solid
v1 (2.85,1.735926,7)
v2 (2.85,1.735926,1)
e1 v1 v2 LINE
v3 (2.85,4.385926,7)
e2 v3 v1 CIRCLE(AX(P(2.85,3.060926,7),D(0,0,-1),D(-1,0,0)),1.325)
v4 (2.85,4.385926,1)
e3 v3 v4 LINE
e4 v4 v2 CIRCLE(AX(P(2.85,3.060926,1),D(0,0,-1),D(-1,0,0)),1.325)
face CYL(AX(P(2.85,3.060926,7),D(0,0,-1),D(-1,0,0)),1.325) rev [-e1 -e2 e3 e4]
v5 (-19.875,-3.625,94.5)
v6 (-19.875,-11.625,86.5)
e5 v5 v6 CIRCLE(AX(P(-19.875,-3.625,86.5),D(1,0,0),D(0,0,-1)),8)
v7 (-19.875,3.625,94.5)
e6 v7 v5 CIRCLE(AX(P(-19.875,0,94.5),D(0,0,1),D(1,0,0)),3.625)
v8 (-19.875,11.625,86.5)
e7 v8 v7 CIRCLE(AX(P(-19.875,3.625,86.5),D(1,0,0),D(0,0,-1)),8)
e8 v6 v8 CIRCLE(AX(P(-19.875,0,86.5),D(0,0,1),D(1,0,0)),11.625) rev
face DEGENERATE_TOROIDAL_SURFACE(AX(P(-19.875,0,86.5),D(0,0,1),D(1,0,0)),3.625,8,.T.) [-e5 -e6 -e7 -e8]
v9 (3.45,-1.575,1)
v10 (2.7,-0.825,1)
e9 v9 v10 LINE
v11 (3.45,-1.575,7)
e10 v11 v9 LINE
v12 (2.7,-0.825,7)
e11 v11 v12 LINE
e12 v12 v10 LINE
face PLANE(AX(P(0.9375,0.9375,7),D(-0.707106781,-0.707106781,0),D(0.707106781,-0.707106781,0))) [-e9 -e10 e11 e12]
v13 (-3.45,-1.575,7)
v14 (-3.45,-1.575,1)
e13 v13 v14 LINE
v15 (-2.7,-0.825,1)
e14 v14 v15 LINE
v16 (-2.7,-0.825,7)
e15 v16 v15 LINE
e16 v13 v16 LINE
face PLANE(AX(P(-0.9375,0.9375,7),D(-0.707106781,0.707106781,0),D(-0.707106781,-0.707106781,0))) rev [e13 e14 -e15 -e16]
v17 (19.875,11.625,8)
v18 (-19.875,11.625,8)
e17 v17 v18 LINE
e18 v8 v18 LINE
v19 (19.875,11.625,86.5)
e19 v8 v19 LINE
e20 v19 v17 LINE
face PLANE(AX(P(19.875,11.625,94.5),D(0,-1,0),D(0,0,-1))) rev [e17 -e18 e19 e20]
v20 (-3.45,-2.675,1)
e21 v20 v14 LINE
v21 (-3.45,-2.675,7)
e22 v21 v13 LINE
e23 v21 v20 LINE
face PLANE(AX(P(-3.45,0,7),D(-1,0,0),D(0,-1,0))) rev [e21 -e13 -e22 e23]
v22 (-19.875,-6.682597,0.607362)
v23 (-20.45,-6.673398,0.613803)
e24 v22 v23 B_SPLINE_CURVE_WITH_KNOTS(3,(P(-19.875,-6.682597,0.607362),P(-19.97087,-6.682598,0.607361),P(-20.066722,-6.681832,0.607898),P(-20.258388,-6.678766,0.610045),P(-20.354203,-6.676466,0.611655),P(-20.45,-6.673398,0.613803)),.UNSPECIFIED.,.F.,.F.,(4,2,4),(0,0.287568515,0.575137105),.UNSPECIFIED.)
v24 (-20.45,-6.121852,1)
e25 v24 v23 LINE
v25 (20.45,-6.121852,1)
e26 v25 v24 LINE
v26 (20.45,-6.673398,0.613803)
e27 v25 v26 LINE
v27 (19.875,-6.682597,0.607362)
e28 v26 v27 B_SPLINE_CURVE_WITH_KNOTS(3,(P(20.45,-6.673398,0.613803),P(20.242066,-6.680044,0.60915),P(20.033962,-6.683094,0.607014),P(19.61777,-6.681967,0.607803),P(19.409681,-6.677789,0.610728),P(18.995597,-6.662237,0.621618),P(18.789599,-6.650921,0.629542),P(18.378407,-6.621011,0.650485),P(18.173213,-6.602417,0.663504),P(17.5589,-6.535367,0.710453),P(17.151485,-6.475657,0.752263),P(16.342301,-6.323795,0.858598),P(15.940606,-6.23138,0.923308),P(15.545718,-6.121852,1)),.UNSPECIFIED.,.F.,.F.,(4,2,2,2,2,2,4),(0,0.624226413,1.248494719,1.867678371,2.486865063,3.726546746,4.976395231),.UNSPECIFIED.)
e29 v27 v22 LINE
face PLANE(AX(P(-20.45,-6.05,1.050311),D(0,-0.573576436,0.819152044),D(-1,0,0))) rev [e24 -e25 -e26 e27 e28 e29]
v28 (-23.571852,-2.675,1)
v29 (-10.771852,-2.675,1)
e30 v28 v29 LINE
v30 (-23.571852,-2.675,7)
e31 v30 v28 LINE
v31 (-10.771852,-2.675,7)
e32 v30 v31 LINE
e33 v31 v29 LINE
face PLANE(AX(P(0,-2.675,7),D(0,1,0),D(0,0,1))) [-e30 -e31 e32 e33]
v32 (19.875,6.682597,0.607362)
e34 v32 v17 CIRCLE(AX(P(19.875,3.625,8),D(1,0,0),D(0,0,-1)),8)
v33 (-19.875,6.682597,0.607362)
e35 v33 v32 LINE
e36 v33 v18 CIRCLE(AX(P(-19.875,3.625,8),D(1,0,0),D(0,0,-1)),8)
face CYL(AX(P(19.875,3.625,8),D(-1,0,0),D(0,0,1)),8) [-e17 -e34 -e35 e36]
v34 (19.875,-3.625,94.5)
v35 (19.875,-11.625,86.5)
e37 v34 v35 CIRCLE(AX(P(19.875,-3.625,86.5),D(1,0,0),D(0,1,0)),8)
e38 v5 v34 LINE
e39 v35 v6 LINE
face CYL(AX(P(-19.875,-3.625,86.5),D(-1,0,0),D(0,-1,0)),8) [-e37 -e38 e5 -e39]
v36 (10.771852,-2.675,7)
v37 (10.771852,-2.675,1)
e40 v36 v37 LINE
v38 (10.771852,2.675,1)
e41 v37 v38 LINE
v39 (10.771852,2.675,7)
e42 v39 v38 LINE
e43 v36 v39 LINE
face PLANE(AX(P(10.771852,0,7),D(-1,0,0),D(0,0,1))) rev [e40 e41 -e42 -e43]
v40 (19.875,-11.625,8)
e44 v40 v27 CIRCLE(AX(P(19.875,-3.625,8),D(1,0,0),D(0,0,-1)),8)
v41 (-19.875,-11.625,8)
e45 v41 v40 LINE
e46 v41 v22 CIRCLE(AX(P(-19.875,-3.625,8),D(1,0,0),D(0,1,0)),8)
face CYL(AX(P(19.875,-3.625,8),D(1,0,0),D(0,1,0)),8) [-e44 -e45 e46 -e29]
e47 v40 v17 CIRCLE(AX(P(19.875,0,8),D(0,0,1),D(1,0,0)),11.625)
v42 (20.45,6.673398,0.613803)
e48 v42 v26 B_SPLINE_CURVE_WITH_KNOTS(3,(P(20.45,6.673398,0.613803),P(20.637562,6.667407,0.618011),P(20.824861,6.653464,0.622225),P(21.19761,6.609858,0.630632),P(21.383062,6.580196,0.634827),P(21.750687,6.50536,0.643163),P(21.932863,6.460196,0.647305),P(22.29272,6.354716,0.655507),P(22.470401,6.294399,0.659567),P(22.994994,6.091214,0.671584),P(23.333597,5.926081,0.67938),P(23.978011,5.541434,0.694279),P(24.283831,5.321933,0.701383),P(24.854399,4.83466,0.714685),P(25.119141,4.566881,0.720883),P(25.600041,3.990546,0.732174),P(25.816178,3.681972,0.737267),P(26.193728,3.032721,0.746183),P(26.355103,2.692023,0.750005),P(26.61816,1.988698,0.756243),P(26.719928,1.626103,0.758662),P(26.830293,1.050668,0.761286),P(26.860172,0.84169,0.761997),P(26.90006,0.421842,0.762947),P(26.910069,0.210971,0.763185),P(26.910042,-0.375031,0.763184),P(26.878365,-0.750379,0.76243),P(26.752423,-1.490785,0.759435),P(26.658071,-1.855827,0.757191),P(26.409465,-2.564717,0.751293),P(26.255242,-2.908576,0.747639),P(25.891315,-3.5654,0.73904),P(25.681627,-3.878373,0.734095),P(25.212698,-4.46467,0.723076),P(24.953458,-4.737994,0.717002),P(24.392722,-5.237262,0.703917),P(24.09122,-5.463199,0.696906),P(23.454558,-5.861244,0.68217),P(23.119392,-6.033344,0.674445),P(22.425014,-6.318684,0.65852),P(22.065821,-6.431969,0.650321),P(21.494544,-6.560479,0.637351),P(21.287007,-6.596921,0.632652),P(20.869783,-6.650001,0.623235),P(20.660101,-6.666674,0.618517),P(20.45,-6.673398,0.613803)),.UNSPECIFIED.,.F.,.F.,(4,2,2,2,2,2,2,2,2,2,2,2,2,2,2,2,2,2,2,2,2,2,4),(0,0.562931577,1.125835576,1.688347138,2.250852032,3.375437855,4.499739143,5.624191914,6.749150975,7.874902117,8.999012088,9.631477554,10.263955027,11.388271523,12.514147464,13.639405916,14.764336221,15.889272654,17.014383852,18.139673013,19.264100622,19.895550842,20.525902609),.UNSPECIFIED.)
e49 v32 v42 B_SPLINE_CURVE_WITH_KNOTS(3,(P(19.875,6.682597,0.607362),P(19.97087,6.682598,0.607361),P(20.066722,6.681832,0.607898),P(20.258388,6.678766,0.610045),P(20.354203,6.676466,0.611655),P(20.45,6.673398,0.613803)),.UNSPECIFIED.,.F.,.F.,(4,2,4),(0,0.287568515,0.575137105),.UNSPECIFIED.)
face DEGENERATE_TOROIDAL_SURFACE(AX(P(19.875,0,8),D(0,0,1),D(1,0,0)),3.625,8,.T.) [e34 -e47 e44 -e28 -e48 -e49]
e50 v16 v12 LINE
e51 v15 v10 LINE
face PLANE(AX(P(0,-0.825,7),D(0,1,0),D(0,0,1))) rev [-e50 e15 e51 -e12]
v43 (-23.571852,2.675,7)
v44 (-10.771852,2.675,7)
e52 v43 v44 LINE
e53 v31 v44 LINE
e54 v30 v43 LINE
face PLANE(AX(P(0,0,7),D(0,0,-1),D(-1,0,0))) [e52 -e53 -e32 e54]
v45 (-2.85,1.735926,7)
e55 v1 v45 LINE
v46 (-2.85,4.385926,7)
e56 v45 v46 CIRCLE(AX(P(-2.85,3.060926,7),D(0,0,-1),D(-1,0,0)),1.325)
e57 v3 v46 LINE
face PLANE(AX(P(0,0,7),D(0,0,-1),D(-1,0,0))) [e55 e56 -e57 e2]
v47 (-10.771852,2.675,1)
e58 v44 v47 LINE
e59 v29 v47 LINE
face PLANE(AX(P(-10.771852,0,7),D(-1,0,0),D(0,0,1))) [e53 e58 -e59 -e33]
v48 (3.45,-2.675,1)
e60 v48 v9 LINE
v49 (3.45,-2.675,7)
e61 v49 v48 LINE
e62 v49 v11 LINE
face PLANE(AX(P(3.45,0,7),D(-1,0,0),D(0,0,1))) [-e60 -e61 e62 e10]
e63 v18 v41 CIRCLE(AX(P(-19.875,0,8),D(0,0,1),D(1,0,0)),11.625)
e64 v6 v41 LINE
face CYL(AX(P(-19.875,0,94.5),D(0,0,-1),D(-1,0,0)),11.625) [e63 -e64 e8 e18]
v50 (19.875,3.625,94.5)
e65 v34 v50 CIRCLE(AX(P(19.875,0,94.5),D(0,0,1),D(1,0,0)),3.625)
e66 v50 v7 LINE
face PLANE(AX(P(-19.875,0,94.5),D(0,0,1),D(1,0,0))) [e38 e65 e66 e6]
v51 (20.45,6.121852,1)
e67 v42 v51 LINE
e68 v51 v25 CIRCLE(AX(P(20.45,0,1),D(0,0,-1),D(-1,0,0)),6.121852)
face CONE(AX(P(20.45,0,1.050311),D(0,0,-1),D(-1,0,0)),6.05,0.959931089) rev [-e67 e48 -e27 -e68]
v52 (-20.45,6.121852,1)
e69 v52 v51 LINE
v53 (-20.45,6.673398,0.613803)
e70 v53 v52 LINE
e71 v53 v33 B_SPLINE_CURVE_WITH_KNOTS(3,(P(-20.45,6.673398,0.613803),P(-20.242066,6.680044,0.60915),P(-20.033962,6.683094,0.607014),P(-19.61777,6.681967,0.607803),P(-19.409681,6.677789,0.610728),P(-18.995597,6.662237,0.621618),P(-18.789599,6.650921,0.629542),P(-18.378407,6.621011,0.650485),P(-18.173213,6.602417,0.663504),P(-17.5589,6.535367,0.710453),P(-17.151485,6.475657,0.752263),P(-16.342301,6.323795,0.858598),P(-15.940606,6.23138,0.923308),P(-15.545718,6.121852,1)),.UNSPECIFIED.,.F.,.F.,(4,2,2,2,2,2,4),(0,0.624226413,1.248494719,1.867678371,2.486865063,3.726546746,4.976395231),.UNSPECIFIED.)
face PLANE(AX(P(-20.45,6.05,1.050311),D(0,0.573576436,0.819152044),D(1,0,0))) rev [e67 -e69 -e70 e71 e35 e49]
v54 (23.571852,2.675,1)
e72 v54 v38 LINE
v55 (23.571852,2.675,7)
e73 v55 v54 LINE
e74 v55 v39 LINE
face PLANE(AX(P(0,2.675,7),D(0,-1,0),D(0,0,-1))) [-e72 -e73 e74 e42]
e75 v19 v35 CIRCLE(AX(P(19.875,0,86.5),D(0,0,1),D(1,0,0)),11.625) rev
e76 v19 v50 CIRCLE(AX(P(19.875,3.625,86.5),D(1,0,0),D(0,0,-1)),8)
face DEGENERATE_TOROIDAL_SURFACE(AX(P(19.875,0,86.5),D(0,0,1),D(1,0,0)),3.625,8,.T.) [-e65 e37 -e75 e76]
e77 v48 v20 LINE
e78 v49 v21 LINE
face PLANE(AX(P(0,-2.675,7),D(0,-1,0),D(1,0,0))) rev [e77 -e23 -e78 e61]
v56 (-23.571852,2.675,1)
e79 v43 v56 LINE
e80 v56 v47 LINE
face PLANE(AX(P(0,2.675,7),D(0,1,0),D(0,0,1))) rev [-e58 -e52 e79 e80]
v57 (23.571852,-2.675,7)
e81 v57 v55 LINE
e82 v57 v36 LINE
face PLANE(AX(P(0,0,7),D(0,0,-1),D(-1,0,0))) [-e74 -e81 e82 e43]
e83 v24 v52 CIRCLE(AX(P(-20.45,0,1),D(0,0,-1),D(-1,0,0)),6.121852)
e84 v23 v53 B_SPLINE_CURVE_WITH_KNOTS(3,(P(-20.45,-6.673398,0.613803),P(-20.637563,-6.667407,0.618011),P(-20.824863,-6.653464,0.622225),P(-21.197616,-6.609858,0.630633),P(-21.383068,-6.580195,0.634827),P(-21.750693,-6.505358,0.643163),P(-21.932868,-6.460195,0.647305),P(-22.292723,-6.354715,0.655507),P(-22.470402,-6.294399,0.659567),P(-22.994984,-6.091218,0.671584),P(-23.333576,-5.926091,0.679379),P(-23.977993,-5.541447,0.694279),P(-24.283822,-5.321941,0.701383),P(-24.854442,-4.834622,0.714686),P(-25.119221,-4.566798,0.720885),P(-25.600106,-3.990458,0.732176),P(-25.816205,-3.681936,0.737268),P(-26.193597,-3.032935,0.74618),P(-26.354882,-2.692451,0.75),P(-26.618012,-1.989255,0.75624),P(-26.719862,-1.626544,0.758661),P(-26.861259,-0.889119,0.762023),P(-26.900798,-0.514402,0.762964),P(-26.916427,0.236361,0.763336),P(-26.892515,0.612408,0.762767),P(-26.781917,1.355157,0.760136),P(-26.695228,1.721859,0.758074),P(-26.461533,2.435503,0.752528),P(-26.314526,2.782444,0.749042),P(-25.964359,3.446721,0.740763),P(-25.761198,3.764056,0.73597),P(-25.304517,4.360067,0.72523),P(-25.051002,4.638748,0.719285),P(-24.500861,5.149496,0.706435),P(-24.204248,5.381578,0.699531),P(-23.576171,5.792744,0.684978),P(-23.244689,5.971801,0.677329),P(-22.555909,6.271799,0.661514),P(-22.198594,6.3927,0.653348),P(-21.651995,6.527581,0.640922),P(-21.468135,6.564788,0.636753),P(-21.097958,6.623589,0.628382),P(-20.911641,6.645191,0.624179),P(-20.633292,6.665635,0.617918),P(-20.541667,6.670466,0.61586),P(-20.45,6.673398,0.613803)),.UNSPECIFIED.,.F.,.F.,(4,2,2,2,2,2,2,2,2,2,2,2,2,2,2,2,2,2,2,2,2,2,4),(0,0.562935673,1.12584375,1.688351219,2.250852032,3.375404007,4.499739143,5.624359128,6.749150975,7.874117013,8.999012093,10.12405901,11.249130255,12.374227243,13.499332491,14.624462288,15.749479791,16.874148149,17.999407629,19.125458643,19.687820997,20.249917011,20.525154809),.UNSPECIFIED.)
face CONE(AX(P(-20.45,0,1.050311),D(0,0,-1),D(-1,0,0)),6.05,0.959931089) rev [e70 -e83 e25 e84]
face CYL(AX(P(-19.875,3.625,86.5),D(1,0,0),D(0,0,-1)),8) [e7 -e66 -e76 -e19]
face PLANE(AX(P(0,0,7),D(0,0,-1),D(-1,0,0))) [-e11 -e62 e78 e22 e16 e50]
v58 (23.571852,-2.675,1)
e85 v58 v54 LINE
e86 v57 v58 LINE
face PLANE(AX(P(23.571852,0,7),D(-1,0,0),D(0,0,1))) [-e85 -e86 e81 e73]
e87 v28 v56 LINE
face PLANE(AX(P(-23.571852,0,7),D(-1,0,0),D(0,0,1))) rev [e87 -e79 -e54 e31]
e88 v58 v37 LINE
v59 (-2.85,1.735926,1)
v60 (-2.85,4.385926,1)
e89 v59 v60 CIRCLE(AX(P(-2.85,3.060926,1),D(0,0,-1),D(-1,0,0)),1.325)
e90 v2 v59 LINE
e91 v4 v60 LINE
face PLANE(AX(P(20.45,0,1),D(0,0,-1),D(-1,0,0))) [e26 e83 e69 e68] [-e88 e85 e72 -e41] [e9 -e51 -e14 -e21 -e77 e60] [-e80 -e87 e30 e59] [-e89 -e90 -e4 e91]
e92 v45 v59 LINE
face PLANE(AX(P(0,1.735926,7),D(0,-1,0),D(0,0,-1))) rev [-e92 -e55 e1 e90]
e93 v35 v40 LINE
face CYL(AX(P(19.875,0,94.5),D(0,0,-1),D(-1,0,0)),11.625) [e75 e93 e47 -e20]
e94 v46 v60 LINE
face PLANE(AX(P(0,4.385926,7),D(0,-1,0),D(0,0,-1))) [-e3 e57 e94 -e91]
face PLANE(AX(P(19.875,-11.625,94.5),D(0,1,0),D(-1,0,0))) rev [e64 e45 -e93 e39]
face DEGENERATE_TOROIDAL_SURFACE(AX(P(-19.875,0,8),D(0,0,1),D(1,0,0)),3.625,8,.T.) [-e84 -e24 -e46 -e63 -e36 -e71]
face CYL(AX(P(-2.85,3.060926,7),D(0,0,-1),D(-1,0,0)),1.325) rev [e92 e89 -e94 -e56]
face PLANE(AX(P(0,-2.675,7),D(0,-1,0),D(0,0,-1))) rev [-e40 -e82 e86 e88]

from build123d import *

# Parameters (mm, degrees)
BOSS_EXTRUDE1_DEPTH = 94.5
CUT_EXTRUDE1_DEPTH  = 1
CHAMFER3_SIZE       = 1.5
CHAMFER3_SIZE_2     = 1.050311307
SKETCH3_W           = 12.8
SKETCH3_H           = 5.35
CUT_EXTRUDE2_DEPTH  = 6
CUT_EXTRUDE3_DEPTH  = 6
CUT_EXTRUDE4_DEPTH  = 6
FILLET1_R           = 8


with BuildPart() as part:
    # Sketch1 → Boss-Extrude1 (new body)
    with BuildSketch(Plane.XY):
        with BuildLine():
            Line((19.875, 11.625), (-19.875, 11.625))
            ThreePointArc((-19.875, 11.625), (-31.5, 0), (-19.875, -11.625))
            Line((-19.875, -11.625), (19.875, -11.625))
            ThreePointArc((19.875, -11.625), (31.5, 0), (19.875, 11.625))
        make_face()
    extrude(amount=BOSS_EXTRUDE1_DEPTH)

    # Sketch2 → Cut-Extrude1 (cut)
    with BuildSketch(Plane(origin=(0, 0, 0), x_dir=(-1, 0, 0), z_dir=(0, 0, -1))):
        with BuildLine():
            Line((20.45, 6.05), (-20.45, 6.05))
            ThreePointArc((-20.45, 6.05), (-26.5, 0), (-20.45, -6.05))
            Line((-20.45, -6.05), (20.45, -6.05))
            ThreePointArc((20.45, -6.05), (26.5, 0), (20.45, 6.05))
        make_face()
    extrude(amount=-CUT_EXTRUDE1_DEPTH, mode=Mode.SUBTRACT)

    # Chamfer3
    # the kernel refuses this chamfer: 1.5, 1.050311307 mm, written as the material it takes off along each edge
    with BuildSketch(Plane(origin=(-20.45, 0, 0), x_dir=(0, -1, 0), z_dir=(1, 0, 0))) as chamfer3_piece_1_section:
        Polygon((6.05 + CHAMFER3_SIZE, 0), (6.05, -CHAMFER3_SIZE_2), (6.05, 0), align=None)
    chamfer3_piece_1 = revolve(axis=Axis((-20.45, 0, 0), (0, 0, -1)), revolution_arc=180, mode=Mode.PRIVATE)
    chamfer3_piece_1 = split(chamfer3_piece_1, bisect_by=Plane(origin=(-27.29545789, 0, 1), z_dir=(0, 0, -1)), keep=Keep.TOP, mode=Mode.PRIVATE)
    add(chamfer3_piece_1, mode=Mode.SUBTRACT)
    with BuildSketch(Plane(origin=(-20.45, 6.05, 0), x_dir=(0, 0.9997533347641299, -0.022209674198457065), z_dir=(1, 0, 0))) as chamfer3_piece_2_section:
        Polygon((CHAMFER3_SIZE * 0.999753334764, CHAMFER3_SIZE * 0.0222096741985), (-CHAMFER3_SIZE_2 * 0.0222096742051, CHAMFER3_SIZE_2 * 0.999753335064), (0, 0), align=None)
    chamfer3_piece_2 = extrude(amount=40.9, mode=Mode.PRIVATE)
    chamfer3_piece_2 = split(chamfer3_piece_2, bisect_by=Plane(origin=(0, 6.554046445, 1), z_dir=(0, 0, -1)), keep=Keep.TOP, mode=Mode.PRIVATE)
    add(chamfer3_piece_2, mode=Mode.SUBTRACT)
    with BuildSketch(Plane(origin=(20.45, -6.05, 0), x_dir=(0, -0.9997533347641299, -0.022209674198457065), z_dir=(-1, 0, 0))) as chamfer3_piece_3_section:
        Polygon((CHAMFER3_SIZE * 0.999753334764, CHAMFER3_SIZE * 0.0222096741985), (-CHAMFER3_SIZE_2 * 0.0222096742051, CHAMFER3_SIZE_2 * 0.999753335064), (0, 0), align=None)
    chamfer3_piece_3 = extrude(amount=40.9, mode=Mode.PRIVATE)
    chamfer3_piece_3 = split(chamfer3_piece_3, bisect_by=Plane(origin=(0, -6.554046445, 1), z_dir=(0, 0, -1)), keep=Keep.TOP, mode=Mode.PRIVATE)
    add(chamfer3_piece_3, mode=Mode.SUBTRACT)
    with BuildSketch(Plane(origin=(20.45, 0, 0), x_dir=(0, 1, 0), z_dir=(-1, 0, 0))) as chamfer3_piece_4_section:
        Polygon((6.05 + CHAMFER3_SIZE, 0), (6.05, -CHAMFER3_SIZE_2), (6.05, 0), align=None)
    chamfer3_piece_4 = revolve(axis=Axis((20.45, 0, 0), (0, 0, -1)), revolution_arc=180, mode=Mode.PRIVATE)
    chamfer3_piece_4 = split(chamfer3_piece_4, bisect_by=Plane(origin=(27.295457889, 0, 1), z_dir=(0, 0, -1)), keep=Keep.TOP, mode=Mode.PRIVATE)
    add(chamfer3_piece_4, mode=Mode.SUBTRACT)

    # Sketch3 → Cut-Extrude2 (cut)
    with BuildSketch(Plane(origin=(0, 0, 1), x_dir=(-1, 0, 0), z_dir=(0, 0, -1))):
        with Locations((-17.171851993, 0)):
            Rectangle(SKETCH3_W, SKETCH3_H)
        with Locations((17.171851993, 0)):
            Rectangle(SKETCH3_W, SKETCH3_H)
    extrude(amount=-CUT_EXTRUDE2_DEPTH, mode=Mode.SUBTRACT)

    # Sketch3<3> → Cut-Extrude3 (cut)
    with BuildSketch(Plane(origin=(0, 0, 1), x_dir=(-1, 0, 0), z_dir=(0, 0, -1))):
        Polygon((-3.45, -2.675), (3.45, -2.675), (3.45, -1.575), (2.7, -0.825), (-2.7, -0.825), (-3.45, -1.575), align=None)
    extrude(amount=-CUT_EXTRUDE3_DEPTH, mode=Mode.SUBTRACT)

    # Sketch3<4> → Cut-Extrude4 (cut)
    with BuildSketch(Plane(origin=(0, 0, 1), x_dir=(-1, 0, 0), z_dir=(0, 0, -1))):
        with BuildLine():
            Line((-2.85, 1.735925997), (2.85, 1.735925997))
            ThreePointArc((2.85, 1.735925997), (4.175, 3.060925997), (2.85, 4.385925997))
            Line((2.85, 4.385925997), (-2.85, 4.385925997))
            ThreePointArc((-2.85, 4.385925997), (-4.175, 3.060925997), (-2.85, 1.735925997))
        make_face()
    extrude(amount=-CUT_EXTRUDE4_DEPTH, mode=Mode.SUBTRACT)

    # Fillet1
    # the kernel refuses this fillet: 8 mm, written as the material it takes off along each edge
    with BuildSketch(Plane(origin=(19.875, 0, 0), x_dir=(0, -1, 0), z_dir=(-1, 0, 0))) as fillet1_piece_1:
        with BuildLine():
            CenterArc((11.625 - FILLET1_R, FILLET1_R), FILLET1_R, 270, 90)
            Line((11.625 - FILLET1_R, 0), (11.625, 0))
            Line((11.625, 0), (11.625, FILLET1_R))
        make_face()
    revolve(axis=Axis((19.875, 0, 0), (0, 0, 1)), revolution_arc=180, mode=Mode.SUBTRACT)
    with BuildSketch(Plane(origin=(-19.875, -11.625, 0), x_dir=(0, 0, 1), z_dir=(1, 0, 0)), Plane(origin=(19.875, 11.625, 94.5), x_dir=(0, -1, 0), z_dir=(-1, 0, 0))) as fillet1_piece_2:
        with BuildLine():
            CenterArc((FILLET1_R, -FILLET1_R), FILLET1_R, 90, 90)
            Line((0, -FILLET1_R), (0, 0))
            Line((0, 0), (FILLET1_R, 0))
        make_face()
    extrude(amount=39.75, mode=Mode.SUBTRACT)
    with BuildSketch(Plane(origin=(-19.875, 0, 0), x_dir=(0, 1, 0), z_dir=(1, 0, 0))) as fillet1_piece_3:
        with BuildLine():
            CenterArc((11.625 - FILLET1_R, FILLET1_R), FILLET1_R, 270, 90)
            Line((11.625 - FILLET1_R, 0), (11.625, 0))
            Line((11.625, 0), (11.625, FILLET1_R))
        make_face()
    revolve(axis=Axis((-19.875, 0, 0), (0, 0, 1)), revolution_arc=180, mode=Mode.SUBTRACT)
    with BuildSketch(Plane(origin=(19.875, 0, 94.5), x_dir=(0, -1, 0), z_dir=(-1, 0, 0))) as fillet1_piece_4:
        with BuildLine():
            CenterArc((11.625 - FILLET1_R, -FILLET1_R), FILLET1_R, 0, 90)
            Line((11.625 - FILLET1_R, 0), (11.625, 0))
            Line((11.625, 0), (11.625, -FILLET1_R))
        make_face()
    revolve(axis=Axis((19.875, 0, 94.5), (0, 0, 1)), revolution_arc=180, mode=Mode.SUBTRACT)
    with BuildSketch(Plane(origin=(-19.875, -11.625, 94.5), x_dir=(0, 0, -1), z_dir=(1, 0, 0)), Plane(origin=(19.875, 11.625, 0), x_dir=(0, -1, 0), z_dir=(-1, 0, 0))) as fillet1_piece_5:
        with BuildLine():
            CenterArc((FILLET1_R, FILLET1_R), FILLET1_R, 180, 90)
            Line((0, FILLET1_R), (0, 0))
            Line((0, 0), (FILLET1_R, 0))
        make_face()
    extrude(amount=39.75, mode=Mode.SUBTRACT)
    with BuildSketch(Plane(origin=(-19.875, 0, 94.5), x_dir=(0, 1, 0), z_dir=(1, 0, 0))) as fillet1_piece_6:
        with BuildLine():
            CenterArc((11.625 - FILLET1_R, -FILLET1_R), FILLET1_R, 0, 90)
            Line((11.625 - FILLET1_R, 0), (11.625, 0))
            Line((11.625, 0), (11.625, -FILLET1_R))
        make_face()
    revolve(axis=Axis((-19.875, 0, 94.5), (0, 0, 1)), revolution_arc=180, mode=Mode.SUBTRACT)


solid = part.part
